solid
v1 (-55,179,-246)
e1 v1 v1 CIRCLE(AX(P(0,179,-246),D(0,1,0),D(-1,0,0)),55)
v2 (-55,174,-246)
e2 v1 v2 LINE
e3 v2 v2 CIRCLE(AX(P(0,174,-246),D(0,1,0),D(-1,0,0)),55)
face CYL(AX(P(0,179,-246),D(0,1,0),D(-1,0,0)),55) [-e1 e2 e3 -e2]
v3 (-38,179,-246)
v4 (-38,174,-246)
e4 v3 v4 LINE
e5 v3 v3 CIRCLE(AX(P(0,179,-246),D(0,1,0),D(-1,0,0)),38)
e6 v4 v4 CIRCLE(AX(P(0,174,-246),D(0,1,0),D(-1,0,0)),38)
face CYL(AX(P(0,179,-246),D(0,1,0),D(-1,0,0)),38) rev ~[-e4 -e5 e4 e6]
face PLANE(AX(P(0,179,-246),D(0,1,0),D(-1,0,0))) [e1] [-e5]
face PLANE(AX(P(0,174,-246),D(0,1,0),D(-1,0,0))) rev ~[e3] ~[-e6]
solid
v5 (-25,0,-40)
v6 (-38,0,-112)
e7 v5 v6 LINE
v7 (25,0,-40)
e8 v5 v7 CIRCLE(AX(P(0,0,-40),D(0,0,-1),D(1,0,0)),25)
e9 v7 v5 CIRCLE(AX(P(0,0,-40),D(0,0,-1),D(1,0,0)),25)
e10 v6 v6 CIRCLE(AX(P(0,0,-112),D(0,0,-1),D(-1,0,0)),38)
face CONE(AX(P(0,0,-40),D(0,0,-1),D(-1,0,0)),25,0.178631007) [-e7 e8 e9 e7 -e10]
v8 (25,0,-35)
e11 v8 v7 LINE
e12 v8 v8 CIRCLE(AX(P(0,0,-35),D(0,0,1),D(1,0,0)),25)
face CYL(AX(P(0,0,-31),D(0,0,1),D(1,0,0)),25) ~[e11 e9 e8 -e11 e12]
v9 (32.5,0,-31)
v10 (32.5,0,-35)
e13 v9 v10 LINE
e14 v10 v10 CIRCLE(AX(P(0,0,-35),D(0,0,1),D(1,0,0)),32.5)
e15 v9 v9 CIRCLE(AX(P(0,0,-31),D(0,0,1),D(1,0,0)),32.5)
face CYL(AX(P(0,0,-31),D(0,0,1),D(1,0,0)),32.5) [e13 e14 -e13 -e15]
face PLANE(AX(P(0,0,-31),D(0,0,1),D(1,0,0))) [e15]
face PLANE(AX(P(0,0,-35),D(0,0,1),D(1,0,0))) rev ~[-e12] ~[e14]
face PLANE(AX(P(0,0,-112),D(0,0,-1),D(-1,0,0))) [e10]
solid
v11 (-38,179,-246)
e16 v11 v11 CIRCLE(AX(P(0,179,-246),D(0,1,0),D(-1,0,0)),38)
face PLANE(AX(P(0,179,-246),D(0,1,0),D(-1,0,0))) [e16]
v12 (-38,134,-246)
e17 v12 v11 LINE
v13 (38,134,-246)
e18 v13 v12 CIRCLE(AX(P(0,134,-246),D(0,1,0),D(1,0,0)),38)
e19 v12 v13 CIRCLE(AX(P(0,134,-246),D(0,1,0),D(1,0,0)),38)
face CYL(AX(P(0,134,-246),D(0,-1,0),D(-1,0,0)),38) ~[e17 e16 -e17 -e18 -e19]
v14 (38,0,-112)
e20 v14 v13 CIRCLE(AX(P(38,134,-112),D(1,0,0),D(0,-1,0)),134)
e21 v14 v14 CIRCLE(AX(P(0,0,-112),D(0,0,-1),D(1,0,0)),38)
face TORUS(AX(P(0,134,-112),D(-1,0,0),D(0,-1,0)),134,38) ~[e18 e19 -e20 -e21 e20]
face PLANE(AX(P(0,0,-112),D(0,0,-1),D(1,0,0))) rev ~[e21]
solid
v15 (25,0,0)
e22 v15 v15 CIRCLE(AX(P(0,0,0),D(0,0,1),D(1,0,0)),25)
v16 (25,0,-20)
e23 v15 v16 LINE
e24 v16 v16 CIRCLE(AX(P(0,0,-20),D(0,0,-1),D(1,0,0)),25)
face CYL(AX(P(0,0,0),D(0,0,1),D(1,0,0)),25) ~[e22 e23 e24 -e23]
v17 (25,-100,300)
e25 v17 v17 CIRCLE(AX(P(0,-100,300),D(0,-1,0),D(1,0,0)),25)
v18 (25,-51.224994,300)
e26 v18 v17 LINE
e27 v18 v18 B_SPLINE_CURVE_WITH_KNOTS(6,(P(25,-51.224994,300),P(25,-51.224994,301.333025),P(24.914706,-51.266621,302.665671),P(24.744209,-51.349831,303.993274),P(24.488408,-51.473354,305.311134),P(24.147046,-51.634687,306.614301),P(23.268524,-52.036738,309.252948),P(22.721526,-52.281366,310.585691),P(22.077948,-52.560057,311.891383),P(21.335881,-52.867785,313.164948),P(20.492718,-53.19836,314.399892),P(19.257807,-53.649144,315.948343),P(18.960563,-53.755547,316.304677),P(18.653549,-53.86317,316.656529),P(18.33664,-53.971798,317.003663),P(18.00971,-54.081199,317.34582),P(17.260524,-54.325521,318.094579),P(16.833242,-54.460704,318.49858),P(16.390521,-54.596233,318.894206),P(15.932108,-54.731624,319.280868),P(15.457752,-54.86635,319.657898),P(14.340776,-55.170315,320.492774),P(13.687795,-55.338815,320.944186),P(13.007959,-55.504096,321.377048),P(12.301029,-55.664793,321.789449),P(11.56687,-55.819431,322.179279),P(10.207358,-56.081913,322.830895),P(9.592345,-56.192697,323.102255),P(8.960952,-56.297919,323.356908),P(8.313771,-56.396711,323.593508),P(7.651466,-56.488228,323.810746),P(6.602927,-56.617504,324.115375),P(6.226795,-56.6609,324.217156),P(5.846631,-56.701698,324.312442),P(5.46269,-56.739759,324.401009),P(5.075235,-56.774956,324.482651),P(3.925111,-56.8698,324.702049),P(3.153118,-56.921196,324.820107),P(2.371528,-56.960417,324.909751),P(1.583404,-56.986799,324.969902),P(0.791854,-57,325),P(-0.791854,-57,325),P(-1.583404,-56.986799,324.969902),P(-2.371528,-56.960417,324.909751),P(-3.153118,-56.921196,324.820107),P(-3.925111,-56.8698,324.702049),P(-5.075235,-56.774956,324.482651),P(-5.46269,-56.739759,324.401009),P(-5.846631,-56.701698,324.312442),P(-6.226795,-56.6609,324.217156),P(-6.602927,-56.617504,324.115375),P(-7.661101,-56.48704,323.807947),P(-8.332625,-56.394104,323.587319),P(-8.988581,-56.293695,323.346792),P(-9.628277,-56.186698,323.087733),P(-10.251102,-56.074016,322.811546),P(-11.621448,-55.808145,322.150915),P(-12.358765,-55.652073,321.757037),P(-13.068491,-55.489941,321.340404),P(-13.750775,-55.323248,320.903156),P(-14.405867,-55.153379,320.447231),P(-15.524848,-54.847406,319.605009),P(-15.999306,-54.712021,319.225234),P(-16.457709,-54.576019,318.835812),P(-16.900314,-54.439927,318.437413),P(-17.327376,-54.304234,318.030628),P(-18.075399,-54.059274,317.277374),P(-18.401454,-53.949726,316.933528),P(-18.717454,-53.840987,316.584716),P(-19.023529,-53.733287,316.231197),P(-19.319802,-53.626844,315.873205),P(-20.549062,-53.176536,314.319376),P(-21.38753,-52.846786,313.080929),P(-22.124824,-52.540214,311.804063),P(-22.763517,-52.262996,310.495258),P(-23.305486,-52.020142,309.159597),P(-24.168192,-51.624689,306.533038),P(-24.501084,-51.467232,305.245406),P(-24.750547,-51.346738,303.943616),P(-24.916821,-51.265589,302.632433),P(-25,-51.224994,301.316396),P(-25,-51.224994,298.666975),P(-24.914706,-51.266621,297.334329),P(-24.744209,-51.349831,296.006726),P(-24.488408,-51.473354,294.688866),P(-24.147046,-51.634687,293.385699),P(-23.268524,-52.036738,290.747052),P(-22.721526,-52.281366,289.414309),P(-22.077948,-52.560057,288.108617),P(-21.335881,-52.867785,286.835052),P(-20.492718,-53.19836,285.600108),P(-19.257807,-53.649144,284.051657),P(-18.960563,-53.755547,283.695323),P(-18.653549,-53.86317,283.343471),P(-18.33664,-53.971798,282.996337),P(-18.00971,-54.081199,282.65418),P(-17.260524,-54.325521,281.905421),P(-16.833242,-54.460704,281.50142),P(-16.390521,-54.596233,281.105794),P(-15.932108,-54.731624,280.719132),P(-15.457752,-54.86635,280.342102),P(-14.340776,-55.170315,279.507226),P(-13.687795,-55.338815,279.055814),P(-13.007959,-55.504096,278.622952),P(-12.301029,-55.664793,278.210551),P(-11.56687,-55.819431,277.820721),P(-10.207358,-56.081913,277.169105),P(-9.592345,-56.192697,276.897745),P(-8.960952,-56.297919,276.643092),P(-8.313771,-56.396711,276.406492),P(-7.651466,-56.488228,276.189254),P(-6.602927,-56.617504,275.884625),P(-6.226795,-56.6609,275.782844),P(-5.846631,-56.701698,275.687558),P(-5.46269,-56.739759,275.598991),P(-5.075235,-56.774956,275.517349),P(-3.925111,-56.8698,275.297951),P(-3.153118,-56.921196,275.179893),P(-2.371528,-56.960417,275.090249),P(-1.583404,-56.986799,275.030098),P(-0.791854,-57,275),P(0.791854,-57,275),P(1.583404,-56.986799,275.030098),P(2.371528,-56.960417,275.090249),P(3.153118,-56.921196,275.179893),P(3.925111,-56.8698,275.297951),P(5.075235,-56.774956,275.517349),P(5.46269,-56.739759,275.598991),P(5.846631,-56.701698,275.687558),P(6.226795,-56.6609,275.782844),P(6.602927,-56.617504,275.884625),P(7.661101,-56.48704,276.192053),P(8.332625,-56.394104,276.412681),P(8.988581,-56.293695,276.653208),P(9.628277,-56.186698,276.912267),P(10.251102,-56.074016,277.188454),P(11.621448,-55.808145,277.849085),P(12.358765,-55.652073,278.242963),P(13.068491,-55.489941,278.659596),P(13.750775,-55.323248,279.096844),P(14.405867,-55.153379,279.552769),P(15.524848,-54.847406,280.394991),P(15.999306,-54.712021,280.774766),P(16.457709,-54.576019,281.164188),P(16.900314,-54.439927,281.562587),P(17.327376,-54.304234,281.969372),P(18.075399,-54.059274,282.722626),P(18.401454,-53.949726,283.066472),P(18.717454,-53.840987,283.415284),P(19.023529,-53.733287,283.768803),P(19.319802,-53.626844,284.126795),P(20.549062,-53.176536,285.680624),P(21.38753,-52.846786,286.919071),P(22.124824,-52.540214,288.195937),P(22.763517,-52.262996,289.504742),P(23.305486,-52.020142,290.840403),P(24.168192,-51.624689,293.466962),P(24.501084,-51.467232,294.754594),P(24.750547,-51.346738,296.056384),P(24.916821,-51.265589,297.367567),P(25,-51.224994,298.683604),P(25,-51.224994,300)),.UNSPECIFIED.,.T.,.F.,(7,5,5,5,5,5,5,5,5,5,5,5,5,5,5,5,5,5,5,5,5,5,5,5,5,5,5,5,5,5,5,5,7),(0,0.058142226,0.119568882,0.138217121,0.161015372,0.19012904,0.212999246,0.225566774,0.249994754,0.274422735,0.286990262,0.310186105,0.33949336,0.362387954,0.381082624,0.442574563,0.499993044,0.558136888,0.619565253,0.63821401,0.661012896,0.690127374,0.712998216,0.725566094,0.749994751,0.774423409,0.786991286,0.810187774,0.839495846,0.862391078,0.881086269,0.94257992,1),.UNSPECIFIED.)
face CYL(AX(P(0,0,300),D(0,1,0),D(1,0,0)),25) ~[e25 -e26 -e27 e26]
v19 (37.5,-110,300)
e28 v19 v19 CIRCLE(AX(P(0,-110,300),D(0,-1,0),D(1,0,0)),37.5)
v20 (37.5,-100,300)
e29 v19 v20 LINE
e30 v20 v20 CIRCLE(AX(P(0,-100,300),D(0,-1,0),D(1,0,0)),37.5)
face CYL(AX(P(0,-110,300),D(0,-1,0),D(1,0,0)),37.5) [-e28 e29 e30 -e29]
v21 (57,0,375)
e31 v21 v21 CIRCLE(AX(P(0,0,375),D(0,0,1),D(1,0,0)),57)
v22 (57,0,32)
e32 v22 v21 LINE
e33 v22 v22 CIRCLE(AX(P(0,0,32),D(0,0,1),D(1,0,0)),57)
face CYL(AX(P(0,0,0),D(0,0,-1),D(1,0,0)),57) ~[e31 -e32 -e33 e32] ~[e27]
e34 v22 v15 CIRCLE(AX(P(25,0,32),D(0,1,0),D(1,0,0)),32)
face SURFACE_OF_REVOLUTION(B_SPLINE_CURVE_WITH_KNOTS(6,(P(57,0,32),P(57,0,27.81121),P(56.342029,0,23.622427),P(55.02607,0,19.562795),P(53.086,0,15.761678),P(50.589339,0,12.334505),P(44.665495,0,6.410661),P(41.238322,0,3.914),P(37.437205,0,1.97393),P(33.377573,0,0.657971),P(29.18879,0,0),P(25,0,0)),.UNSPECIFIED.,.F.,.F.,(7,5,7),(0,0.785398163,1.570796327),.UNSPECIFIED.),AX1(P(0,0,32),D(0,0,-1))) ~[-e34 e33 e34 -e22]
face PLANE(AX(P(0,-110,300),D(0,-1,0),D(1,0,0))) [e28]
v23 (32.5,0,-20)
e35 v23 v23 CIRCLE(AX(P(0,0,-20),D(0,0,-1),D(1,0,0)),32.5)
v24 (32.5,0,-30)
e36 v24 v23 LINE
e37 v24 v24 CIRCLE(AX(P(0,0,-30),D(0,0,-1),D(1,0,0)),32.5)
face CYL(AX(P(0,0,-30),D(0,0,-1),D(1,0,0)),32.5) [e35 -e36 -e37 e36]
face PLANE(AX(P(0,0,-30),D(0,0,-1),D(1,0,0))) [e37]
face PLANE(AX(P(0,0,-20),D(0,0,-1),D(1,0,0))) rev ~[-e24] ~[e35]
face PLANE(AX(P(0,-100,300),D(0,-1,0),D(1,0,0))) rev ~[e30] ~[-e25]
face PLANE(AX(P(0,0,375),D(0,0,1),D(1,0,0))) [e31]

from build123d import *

# Parameters (mm, degrees)
F0_R      = 57
F1_DEPTH  = 375
F2_R      = 32
F3_R      = 25
F4_DEPTH  = 110
F5_R      = 37.5
F5_R_2    = 25
F6_DEPTH  = 10
F7_R      = 25
F8_DEPTH  = 30
F9_R      = 32.5
F9_R_2    = 25
F10_DEPTH = 10
F12_R     = 25
F13_DEPTH = 9
F14_R     = 32.5
F14_R_2   = 25
F15_DEPTH = 4
F18_R     = 38
F19_ANGLE = 90
F20_R     = 38
F21_DEPTH = 45
F22_R     = 55
F22_R_2   = 38
F23_DEPTH = 5


with BuildPart() as f1:
    # F0 (on Top) → F1 (new body)
    with BuildSketch(Plane.XY):
        Circle(F0_R)
    extrude(amount=F1_DEPTH)

    # F2
    f2_edges = [f1.edges().sort_by_distance(p)[0] for p in [
        (-57, 0, 0),
    ]]
    fillet(f2_edges, radius=F2_R)

    # F3 (on Front) → F4 (join)
    with BuildSketch(Plane.XZ):
        with Locations((0, 300)):
            Circle(F3_R)
    extrude(amount=F4_DEPTH)

    # F5 (on face) → F6 (join)
    with BuildSketch(Plane.XZ.offset(110)):
        with Locations((0, 300)):
            Circle(F5_R)
        with Locations((0, 300)):
            Circle(F5_R_2, mode=Mode.SUBTRACT)
    extrude(amount=-F6_DEPTH)

    # F7 (on face) → F8 (join)
    with BuildSketch(Plane(origin=(0, 0, 0), x_dir=(1, 0, 0), z_dir=(0, 0, -1))):
        Circle(F7_R)
    extrude(amount=F8_DEPTH)

    # F9 (on face) → F10 (join)
    with BuildSketch(Plane(origin=(0, 0, -30), x_dir=(1, 0, 0), z_dir=(0, 0, -1))):
        Circle(F9_R)
        Circle(F9_R_2, mode=Mode.SUBTRACT)
    extrude(amount=-F10_DEPTH)


with BuildPart() as f13:
    # F12 (on offset) → F13 (new body)
    with BuildSketch(Plane(origin=(0, 0, -31), x_dir=(1, 0, 0), z_dir=(0, 0, -1))):
        Circle(F12_R)
    extrude(amount=F13_DEPTH)

    # F14 (on face) → F15 (join)
    with BuildSketch(Plane.XY.offset(-31)):
        Circle(F14_R)
        Circle(F14_R_2, mode=Mode.SUBTRACT)
    extrude(amount=-F15_DEPTH)

    # F16 (on Front) → F17 (revolve)
    with BuildSketch(Plane.XZ):
        Polygon((0, -112), (0, -40), (-25, -40), (-38, -112), align=None)
    revolve(axis=Axis((0, 0, -76), (0, 0, -1)))


with BuildPart() as f19:
    # F18 (on face) → F19 (revolve)
    with BuildSketch(Plane(origin=(0, 0, -112), x_dir=(1, 0, 0), z_dir=(0, 0, -1))):
        Circle(F18_R)
    revolve(axis=Axis((-15.2300149202, 134, -112), (1, 0, 0)), revolution_arc=F19_ANGLE)

    # F20 (on face) → F21 (join)
    with BuildSketch(Plane(origin=(0, 134, 0), x_dir=(-1, 0, 0), z_dir=(0, 1, 0))):
        with Locations((0, -246)):
            Circle(F20_R)
    extrude(amount=F21_DEPTH)


with BuildPart() as f23:
    # F22 (on face) → F23 (new body)
    with BuildSketch(Plane(origin=(0, 179, 0), x_dir=(-1, 0, 0), z_dir=(0, 1, 0))):
        with Locations((0, -246)):
            Circle(F22_R)
        with Locations((0, -246)):
            Circle(F22_R_2, mode=Mode.SUBTRACT)
    extrude(amount=-F23_DEPTH)


solid = Compound([f1.part, f13.part, f19.part, f23.part])
